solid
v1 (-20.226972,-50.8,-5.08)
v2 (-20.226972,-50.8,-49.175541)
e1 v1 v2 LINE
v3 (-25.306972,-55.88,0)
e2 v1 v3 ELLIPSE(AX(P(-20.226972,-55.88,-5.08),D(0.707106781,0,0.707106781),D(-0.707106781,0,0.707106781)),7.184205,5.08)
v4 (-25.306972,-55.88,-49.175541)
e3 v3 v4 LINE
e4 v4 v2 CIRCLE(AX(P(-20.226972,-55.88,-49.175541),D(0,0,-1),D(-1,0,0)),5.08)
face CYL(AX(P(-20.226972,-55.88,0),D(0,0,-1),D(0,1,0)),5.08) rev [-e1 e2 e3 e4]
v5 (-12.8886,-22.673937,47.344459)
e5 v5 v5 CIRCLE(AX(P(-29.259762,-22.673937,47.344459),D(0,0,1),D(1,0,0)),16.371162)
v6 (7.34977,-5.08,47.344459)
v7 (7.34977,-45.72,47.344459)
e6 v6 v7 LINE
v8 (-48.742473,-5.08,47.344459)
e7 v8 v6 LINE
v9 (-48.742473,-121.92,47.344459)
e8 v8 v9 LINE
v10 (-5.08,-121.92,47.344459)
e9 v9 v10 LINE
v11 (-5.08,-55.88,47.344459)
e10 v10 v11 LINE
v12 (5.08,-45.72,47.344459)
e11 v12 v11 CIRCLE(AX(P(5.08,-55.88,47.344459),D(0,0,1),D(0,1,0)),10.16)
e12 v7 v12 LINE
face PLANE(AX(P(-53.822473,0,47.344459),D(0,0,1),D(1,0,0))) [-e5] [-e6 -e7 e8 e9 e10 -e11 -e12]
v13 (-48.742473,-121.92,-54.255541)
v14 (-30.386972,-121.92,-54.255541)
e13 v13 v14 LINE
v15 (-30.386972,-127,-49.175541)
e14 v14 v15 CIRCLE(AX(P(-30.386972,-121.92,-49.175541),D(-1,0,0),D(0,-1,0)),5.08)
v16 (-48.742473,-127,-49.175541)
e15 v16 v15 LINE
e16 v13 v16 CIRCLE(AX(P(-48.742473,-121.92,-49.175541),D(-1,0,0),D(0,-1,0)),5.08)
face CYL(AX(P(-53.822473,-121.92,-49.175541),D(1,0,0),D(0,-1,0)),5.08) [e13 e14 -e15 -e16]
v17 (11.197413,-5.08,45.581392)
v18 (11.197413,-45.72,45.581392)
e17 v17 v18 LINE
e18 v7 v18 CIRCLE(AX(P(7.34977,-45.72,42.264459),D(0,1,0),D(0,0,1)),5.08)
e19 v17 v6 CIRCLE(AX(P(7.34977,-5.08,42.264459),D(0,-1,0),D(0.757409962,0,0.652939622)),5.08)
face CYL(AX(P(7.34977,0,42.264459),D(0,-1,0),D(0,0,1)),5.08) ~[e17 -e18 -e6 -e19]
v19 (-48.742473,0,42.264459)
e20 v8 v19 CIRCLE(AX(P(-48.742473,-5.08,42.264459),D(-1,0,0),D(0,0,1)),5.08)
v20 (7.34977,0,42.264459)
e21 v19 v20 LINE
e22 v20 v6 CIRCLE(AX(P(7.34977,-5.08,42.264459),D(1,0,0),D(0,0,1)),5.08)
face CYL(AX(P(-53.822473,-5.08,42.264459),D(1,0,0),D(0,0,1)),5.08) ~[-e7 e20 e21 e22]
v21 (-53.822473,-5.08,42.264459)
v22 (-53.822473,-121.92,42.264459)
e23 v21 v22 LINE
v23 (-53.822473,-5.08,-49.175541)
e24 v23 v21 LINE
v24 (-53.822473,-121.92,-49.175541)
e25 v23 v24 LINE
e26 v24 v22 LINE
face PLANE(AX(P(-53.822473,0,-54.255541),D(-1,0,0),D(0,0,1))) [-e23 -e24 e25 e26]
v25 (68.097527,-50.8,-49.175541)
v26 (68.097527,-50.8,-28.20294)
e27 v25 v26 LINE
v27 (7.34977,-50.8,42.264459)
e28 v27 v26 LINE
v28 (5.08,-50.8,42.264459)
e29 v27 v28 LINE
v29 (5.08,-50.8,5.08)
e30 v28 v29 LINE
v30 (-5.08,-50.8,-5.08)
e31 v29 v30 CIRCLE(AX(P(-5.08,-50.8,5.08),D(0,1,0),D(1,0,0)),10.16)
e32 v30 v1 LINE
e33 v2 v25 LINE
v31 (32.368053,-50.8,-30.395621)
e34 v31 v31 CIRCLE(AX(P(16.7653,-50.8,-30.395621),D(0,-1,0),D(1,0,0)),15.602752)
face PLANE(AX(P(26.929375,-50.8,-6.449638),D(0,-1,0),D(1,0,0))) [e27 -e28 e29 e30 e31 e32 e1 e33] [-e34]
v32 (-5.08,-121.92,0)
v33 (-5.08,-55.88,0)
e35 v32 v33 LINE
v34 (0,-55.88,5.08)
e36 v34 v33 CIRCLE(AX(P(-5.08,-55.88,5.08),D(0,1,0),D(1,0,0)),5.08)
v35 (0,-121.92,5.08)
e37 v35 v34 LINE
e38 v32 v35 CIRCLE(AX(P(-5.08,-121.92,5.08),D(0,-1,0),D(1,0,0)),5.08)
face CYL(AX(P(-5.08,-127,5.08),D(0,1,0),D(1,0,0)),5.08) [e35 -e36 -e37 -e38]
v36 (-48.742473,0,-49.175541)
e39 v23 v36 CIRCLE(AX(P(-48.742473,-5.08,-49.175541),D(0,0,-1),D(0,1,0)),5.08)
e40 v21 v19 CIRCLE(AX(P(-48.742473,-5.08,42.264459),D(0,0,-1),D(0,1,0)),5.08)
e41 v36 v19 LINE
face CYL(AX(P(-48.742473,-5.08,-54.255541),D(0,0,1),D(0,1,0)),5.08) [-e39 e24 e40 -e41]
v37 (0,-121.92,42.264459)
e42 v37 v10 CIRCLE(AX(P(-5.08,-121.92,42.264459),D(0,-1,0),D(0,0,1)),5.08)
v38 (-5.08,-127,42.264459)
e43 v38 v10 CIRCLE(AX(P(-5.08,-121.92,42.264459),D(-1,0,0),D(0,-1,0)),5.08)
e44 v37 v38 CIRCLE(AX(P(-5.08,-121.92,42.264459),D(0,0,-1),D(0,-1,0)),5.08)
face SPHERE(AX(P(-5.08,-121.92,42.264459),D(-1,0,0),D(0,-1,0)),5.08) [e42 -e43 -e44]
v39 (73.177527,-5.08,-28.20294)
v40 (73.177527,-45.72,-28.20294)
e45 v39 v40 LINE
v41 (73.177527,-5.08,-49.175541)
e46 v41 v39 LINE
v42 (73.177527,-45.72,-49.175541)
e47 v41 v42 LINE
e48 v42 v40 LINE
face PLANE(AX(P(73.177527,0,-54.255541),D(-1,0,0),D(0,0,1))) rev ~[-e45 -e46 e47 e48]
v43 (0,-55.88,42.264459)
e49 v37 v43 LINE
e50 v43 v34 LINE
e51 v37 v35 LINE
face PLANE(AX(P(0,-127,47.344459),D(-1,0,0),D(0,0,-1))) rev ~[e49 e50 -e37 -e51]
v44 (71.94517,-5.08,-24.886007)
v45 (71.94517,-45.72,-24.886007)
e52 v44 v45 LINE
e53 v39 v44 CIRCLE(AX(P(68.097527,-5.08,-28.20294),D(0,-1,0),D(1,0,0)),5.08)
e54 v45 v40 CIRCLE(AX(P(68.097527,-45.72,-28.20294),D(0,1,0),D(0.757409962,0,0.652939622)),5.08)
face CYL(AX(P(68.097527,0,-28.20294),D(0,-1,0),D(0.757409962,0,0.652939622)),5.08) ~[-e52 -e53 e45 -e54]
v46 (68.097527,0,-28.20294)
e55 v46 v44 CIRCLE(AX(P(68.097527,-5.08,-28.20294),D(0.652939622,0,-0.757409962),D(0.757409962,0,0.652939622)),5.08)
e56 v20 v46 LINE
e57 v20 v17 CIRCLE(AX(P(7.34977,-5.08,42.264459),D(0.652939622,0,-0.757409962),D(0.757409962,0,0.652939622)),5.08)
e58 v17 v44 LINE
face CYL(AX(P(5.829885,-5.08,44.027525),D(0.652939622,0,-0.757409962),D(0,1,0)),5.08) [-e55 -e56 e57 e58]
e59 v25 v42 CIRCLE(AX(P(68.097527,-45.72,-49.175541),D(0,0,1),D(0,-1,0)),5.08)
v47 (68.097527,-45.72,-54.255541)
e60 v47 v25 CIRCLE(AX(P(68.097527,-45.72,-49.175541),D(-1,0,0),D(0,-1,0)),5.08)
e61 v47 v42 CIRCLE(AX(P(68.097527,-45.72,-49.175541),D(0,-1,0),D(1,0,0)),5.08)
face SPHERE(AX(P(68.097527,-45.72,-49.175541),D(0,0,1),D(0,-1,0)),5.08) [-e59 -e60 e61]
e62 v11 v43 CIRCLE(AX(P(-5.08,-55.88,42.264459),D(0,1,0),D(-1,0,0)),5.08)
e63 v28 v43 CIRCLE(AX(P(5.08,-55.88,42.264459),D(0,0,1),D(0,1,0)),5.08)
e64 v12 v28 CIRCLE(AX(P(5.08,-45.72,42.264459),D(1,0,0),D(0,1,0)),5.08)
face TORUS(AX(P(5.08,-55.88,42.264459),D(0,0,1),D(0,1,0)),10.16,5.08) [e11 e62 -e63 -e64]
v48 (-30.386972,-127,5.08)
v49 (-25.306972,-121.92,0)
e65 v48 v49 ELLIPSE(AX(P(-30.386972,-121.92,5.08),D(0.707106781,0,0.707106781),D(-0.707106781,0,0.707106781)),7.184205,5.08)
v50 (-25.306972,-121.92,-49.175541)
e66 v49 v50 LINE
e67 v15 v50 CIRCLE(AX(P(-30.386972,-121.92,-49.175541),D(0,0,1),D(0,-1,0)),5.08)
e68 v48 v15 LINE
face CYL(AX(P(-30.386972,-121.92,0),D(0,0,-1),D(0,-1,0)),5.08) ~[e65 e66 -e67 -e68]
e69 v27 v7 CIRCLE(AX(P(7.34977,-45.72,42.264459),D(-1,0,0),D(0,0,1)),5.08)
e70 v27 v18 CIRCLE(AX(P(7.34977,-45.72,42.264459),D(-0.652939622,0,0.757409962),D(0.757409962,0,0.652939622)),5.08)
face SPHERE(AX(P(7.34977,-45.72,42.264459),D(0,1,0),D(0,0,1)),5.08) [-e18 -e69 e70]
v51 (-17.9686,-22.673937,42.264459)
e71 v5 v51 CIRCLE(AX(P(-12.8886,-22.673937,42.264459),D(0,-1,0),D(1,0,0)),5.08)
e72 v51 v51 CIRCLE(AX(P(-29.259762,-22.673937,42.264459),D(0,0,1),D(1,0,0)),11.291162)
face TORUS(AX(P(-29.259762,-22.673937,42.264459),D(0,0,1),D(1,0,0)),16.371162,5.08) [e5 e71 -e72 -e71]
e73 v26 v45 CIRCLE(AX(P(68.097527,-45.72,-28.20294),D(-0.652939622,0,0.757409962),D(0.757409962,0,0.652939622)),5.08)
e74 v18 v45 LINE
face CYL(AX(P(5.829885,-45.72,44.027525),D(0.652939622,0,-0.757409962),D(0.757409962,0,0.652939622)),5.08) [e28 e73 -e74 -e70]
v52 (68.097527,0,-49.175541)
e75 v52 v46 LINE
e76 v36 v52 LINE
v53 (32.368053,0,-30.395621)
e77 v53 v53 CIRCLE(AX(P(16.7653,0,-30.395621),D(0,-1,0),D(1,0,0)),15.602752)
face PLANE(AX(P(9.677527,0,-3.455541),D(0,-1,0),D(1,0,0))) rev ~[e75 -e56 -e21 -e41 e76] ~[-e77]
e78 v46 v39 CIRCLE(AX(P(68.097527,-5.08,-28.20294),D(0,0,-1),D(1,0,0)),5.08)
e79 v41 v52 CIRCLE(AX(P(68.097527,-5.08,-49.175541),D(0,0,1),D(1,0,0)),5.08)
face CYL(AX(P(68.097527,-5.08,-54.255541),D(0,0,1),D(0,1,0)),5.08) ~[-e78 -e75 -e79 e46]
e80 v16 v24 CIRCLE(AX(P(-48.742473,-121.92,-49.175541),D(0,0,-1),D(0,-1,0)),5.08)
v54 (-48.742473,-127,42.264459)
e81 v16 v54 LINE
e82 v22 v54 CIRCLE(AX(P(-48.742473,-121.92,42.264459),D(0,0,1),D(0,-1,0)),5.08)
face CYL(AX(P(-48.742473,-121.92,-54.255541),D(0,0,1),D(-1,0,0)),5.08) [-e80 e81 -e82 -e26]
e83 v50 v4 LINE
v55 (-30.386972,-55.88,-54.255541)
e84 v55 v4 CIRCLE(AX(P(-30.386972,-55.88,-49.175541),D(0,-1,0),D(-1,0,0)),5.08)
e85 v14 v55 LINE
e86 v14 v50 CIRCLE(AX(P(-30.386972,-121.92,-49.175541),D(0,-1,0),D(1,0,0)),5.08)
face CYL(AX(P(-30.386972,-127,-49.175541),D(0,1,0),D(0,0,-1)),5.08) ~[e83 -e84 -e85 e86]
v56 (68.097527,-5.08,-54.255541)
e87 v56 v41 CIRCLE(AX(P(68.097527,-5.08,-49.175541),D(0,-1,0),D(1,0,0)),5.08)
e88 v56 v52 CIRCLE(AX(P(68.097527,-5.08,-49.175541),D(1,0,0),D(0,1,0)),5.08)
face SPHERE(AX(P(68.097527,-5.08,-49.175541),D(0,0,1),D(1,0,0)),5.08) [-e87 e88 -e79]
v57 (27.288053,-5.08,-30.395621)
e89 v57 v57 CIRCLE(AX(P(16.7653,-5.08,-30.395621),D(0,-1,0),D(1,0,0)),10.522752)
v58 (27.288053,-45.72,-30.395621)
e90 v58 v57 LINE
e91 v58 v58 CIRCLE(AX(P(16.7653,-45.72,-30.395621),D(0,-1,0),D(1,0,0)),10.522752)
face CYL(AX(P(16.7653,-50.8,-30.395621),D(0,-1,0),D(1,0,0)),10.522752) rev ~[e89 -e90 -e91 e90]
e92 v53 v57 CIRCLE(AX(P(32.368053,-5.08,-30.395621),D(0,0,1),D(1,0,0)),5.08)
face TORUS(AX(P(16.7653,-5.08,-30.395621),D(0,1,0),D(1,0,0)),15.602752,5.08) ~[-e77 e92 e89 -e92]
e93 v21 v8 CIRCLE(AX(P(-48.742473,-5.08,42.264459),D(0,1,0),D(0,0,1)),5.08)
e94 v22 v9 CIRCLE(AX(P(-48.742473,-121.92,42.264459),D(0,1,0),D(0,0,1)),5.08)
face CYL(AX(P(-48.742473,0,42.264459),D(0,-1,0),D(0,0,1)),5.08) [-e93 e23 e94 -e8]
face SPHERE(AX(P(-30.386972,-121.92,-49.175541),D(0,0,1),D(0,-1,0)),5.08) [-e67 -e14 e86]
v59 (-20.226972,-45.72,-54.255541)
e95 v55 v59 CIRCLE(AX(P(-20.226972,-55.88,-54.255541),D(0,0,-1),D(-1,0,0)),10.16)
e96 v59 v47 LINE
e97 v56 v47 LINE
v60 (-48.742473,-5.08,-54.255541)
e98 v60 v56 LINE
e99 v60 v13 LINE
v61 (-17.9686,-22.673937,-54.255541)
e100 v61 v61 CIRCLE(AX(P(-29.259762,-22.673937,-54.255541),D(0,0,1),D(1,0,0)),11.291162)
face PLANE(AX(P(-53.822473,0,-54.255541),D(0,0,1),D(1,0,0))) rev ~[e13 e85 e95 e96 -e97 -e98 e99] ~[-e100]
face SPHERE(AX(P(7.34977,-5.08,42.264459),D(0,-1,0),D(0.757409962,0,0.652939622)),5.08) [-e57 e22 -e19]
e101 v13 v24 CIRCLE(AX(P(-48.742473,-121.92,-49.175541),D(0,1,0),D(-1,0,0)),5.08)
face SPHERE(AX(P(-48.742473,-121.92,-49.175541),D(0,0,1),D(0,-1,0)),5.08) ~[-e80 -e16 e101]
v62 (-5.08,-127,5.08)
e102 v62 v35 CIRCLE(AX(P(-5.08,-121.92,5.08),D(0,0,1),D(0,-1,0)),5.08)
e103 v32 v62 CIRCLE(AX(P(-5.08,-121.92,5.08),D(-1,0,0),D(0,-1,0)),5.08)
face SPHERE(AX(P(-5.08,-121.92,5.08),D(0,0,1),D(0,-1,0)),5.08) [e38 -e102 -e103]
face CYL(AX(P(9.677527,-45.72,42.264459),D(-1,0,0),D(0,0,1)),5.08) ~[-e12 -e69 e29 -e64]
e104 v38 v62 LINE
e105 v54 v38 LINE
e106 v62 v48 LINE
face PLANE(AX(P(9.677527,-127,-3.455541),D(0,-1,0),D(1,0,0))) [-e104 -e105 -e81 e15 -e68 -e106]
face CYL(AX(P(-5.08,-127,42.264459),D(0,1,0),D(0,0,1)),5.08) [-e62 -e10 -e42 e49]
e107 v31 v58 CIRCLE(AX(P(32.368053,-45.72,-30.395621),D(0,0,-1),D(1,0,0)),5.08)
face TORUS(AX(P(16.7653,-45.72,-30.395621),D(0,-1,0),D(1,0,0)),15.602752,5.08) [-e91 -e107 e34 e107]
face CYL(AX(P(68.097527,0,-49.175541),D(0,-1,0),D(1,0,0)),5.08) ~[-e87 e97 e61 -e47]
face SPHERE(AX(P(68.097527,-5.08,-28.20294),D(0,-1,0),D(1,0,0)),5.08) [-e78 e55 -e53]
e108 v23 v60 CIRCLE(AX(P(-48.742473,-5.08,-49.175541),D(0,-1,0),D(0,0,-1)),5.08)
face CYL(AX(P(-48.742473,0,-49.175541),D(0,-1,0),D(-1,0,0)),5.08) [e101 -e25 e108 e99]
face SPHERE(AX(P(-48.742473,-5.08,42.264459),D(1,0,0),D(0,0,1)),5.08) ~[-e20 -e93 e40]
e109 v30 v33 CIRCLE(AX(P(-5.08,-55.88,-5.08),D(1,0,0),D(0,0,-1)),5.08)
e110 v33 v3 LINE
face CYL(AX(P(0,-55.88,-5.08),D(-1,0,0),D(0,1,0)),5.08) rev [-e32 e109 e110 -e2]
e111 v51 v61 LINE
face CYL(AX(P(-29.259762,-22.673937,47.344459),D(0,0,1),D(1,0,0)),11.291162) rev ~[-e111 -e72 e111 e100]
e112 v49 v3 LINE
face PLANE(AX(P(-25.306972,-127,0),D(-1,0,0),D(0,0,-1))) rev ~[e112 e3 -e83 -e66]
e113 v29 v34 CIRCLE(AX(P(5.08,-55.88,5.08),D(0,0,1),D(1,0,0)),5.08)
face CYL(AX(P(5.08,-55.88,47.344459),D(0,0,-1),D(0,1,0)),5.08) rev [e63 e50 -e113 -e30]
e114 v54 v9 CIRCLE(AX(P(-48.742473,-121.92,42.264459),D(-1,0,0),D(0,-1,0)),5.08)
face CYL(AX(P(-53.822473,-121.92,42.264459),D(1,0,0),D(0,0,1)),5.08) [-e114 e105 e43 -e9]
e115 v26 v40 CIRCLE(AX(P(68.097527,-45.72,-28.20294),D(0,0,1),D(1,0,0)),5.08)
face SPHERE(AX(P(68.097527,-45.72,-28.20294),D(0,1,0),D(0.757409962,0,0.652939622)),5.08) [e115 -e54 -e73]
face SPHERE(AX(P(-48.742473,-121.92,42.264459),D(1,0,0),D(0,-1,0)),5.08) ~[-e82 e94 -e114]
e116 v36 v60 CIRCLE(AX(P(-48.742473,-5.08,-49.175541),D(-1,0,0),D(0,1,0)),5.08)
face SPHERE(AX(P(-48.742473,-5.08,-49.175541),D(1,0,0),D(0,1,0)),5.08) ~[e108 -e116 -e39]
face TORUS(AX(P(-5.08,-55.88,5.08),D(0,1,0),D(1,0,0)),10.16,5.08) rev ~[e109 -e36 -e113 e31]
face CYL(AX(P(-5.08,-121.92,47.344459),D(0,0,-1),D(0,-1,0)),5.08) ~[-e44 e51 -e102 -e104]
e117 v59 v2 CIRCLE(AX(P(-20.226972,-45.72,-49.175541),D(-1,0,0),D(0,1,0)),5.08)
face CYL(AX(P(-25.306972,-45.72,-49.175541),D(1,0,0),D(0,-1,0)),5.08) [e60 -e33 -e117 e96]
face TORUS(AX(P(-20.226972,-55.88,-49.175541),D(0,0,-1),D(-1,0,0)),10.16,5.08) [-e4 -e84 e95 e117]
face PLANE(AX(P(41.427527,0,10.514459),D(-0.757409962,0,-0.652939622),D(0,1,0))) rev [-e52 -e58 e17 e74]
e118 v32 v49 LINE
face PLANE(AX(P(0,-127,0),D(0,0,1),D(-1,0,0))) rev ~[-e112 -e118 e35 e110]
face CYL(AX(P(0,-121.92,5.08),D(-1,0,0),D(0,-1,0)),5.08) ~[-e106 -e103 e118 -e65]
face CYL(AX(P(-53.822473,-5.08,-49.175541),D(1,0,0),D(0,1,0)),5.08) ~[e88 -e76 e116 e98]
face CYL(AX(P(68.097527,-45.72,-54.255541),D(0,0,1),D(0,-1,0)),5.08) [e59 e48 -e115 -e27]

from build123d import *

# Parameters (mm, degrees)
F0_W     = 127
F0_H     = 101.6
F1_DEPTH = 127
F3_DEPTH = 76.2
F4_R     = 10.5227523194
F5_DEPTH = 50.801
F6_R     = 11.2911618422
F7_DEPTH = 101.601
F8_SIZE2 = 73.66
F8_SIZE  = 63.5
F9_R     = 5.08


with BuildPart() as f1:
    # F0 (on Front) → F1 (new body)
    with BuildSketch(Plane.XZ):
        with Locations((9.6775274724, -3.4555412512)):
            Rectangle(F0_W, F0_H)
    extrude(amount=F1_DEPTH)

    # F2 (on face) → F3 (cut)
    with BuildSketch(Plane.XZ.offset(127)):
        Polygon((73.1775274724, 47.3444587488), (0, 47.3444587488), (0, 0), (-25.3069717437, 0), (-25.3069717437, -54.2555412512), (73.1775274724, -54.2555412512), align=None)
    extrude(amount=-F3_DEPTH, mode=Mode.SUBTRACT)

    # F4 (on face) → F5 (cut, through all)
    with BuildSketch(Plane.XZ.offset(50.8)):
        with Locations((16.7653001845, -30.3956214339)):
            Circle(F4_R)
    extrude(amount=-F5_DEPTH, mode=Mode.SUBTRACT)

    # F6 (on face) → F7 (cut, through all)
    with BuildSketch(Plane.XY.offset(47.3444587488)):
        with Locations((-29.2597617954, -22.6739365608)):
            Circle(F6_R)
    extrude(amount=-F7_DEPTH, mode=Mode.SUBTRACT)

    # F8
    f8_edges = [f1.edges().sort_by_distance(p)[0] for p in [
        (73.177527, -25.4, 47.344459),
    ]]
    f8_side = f1.faces().sort_by_distance((-3.567211, -51.159815, 47.344459))[0]
    chamfer(f8_edges, length=F8_SIZE, length2=F8_SIZE2, reference=f8_side)

    # F9
    f9_edges = [f1.edges().sort_by_distance(p)[0] for p in [
        (-26.911236, -127, 47.344459),
        (-53.822473, -127, -3.455541),
        (0, -127, 23.672229),
        (-12.653486, -127, 0),
        (-25.306972, -127, -27.127771),
        (-39.564722, -127, -54.255541),
        (0, -88.9, 47.344459),
        (0, -88.9, 0),
        (0, -50.8, 23.672229),
        (-22.072473, 0, 47.344459),
        (9.677527, -25.4, 47.344459),
        (-53.822473, -63.5, 47.344459),
        (4.838764, -50.8, 47.344459),
        (-40.550924, -22.673937, 47.344459),
        (41.427527, 0, 10.514459),
        (73.177527, -25.4, -26.315541),
        (41.427527, -50.8, 10.514459),
        (73.177527, -50.8, -40.285541),
        (-12.653486, -50.8, 0),
        (23.935278, -50.8, -54.255541),
        (-25.306972, -50.8, -27.127771),
        (6.242548, -50.8, -30.395621),
        (73.177527, 0, -40.285541),
        (73.177527, -25.4, -54.255541),
        (9.677527, 0, -54.255541),
        (-53.822473, 0, -3.455541),
        (6.242548, 0, -30.395621),
        (-53.822473, -63.5, -54.255541),
        (-25.306972, -88.9, -54.255541),
    ]]
    fillet(f9_edges, radius=F9_R)


solid = f1.part
